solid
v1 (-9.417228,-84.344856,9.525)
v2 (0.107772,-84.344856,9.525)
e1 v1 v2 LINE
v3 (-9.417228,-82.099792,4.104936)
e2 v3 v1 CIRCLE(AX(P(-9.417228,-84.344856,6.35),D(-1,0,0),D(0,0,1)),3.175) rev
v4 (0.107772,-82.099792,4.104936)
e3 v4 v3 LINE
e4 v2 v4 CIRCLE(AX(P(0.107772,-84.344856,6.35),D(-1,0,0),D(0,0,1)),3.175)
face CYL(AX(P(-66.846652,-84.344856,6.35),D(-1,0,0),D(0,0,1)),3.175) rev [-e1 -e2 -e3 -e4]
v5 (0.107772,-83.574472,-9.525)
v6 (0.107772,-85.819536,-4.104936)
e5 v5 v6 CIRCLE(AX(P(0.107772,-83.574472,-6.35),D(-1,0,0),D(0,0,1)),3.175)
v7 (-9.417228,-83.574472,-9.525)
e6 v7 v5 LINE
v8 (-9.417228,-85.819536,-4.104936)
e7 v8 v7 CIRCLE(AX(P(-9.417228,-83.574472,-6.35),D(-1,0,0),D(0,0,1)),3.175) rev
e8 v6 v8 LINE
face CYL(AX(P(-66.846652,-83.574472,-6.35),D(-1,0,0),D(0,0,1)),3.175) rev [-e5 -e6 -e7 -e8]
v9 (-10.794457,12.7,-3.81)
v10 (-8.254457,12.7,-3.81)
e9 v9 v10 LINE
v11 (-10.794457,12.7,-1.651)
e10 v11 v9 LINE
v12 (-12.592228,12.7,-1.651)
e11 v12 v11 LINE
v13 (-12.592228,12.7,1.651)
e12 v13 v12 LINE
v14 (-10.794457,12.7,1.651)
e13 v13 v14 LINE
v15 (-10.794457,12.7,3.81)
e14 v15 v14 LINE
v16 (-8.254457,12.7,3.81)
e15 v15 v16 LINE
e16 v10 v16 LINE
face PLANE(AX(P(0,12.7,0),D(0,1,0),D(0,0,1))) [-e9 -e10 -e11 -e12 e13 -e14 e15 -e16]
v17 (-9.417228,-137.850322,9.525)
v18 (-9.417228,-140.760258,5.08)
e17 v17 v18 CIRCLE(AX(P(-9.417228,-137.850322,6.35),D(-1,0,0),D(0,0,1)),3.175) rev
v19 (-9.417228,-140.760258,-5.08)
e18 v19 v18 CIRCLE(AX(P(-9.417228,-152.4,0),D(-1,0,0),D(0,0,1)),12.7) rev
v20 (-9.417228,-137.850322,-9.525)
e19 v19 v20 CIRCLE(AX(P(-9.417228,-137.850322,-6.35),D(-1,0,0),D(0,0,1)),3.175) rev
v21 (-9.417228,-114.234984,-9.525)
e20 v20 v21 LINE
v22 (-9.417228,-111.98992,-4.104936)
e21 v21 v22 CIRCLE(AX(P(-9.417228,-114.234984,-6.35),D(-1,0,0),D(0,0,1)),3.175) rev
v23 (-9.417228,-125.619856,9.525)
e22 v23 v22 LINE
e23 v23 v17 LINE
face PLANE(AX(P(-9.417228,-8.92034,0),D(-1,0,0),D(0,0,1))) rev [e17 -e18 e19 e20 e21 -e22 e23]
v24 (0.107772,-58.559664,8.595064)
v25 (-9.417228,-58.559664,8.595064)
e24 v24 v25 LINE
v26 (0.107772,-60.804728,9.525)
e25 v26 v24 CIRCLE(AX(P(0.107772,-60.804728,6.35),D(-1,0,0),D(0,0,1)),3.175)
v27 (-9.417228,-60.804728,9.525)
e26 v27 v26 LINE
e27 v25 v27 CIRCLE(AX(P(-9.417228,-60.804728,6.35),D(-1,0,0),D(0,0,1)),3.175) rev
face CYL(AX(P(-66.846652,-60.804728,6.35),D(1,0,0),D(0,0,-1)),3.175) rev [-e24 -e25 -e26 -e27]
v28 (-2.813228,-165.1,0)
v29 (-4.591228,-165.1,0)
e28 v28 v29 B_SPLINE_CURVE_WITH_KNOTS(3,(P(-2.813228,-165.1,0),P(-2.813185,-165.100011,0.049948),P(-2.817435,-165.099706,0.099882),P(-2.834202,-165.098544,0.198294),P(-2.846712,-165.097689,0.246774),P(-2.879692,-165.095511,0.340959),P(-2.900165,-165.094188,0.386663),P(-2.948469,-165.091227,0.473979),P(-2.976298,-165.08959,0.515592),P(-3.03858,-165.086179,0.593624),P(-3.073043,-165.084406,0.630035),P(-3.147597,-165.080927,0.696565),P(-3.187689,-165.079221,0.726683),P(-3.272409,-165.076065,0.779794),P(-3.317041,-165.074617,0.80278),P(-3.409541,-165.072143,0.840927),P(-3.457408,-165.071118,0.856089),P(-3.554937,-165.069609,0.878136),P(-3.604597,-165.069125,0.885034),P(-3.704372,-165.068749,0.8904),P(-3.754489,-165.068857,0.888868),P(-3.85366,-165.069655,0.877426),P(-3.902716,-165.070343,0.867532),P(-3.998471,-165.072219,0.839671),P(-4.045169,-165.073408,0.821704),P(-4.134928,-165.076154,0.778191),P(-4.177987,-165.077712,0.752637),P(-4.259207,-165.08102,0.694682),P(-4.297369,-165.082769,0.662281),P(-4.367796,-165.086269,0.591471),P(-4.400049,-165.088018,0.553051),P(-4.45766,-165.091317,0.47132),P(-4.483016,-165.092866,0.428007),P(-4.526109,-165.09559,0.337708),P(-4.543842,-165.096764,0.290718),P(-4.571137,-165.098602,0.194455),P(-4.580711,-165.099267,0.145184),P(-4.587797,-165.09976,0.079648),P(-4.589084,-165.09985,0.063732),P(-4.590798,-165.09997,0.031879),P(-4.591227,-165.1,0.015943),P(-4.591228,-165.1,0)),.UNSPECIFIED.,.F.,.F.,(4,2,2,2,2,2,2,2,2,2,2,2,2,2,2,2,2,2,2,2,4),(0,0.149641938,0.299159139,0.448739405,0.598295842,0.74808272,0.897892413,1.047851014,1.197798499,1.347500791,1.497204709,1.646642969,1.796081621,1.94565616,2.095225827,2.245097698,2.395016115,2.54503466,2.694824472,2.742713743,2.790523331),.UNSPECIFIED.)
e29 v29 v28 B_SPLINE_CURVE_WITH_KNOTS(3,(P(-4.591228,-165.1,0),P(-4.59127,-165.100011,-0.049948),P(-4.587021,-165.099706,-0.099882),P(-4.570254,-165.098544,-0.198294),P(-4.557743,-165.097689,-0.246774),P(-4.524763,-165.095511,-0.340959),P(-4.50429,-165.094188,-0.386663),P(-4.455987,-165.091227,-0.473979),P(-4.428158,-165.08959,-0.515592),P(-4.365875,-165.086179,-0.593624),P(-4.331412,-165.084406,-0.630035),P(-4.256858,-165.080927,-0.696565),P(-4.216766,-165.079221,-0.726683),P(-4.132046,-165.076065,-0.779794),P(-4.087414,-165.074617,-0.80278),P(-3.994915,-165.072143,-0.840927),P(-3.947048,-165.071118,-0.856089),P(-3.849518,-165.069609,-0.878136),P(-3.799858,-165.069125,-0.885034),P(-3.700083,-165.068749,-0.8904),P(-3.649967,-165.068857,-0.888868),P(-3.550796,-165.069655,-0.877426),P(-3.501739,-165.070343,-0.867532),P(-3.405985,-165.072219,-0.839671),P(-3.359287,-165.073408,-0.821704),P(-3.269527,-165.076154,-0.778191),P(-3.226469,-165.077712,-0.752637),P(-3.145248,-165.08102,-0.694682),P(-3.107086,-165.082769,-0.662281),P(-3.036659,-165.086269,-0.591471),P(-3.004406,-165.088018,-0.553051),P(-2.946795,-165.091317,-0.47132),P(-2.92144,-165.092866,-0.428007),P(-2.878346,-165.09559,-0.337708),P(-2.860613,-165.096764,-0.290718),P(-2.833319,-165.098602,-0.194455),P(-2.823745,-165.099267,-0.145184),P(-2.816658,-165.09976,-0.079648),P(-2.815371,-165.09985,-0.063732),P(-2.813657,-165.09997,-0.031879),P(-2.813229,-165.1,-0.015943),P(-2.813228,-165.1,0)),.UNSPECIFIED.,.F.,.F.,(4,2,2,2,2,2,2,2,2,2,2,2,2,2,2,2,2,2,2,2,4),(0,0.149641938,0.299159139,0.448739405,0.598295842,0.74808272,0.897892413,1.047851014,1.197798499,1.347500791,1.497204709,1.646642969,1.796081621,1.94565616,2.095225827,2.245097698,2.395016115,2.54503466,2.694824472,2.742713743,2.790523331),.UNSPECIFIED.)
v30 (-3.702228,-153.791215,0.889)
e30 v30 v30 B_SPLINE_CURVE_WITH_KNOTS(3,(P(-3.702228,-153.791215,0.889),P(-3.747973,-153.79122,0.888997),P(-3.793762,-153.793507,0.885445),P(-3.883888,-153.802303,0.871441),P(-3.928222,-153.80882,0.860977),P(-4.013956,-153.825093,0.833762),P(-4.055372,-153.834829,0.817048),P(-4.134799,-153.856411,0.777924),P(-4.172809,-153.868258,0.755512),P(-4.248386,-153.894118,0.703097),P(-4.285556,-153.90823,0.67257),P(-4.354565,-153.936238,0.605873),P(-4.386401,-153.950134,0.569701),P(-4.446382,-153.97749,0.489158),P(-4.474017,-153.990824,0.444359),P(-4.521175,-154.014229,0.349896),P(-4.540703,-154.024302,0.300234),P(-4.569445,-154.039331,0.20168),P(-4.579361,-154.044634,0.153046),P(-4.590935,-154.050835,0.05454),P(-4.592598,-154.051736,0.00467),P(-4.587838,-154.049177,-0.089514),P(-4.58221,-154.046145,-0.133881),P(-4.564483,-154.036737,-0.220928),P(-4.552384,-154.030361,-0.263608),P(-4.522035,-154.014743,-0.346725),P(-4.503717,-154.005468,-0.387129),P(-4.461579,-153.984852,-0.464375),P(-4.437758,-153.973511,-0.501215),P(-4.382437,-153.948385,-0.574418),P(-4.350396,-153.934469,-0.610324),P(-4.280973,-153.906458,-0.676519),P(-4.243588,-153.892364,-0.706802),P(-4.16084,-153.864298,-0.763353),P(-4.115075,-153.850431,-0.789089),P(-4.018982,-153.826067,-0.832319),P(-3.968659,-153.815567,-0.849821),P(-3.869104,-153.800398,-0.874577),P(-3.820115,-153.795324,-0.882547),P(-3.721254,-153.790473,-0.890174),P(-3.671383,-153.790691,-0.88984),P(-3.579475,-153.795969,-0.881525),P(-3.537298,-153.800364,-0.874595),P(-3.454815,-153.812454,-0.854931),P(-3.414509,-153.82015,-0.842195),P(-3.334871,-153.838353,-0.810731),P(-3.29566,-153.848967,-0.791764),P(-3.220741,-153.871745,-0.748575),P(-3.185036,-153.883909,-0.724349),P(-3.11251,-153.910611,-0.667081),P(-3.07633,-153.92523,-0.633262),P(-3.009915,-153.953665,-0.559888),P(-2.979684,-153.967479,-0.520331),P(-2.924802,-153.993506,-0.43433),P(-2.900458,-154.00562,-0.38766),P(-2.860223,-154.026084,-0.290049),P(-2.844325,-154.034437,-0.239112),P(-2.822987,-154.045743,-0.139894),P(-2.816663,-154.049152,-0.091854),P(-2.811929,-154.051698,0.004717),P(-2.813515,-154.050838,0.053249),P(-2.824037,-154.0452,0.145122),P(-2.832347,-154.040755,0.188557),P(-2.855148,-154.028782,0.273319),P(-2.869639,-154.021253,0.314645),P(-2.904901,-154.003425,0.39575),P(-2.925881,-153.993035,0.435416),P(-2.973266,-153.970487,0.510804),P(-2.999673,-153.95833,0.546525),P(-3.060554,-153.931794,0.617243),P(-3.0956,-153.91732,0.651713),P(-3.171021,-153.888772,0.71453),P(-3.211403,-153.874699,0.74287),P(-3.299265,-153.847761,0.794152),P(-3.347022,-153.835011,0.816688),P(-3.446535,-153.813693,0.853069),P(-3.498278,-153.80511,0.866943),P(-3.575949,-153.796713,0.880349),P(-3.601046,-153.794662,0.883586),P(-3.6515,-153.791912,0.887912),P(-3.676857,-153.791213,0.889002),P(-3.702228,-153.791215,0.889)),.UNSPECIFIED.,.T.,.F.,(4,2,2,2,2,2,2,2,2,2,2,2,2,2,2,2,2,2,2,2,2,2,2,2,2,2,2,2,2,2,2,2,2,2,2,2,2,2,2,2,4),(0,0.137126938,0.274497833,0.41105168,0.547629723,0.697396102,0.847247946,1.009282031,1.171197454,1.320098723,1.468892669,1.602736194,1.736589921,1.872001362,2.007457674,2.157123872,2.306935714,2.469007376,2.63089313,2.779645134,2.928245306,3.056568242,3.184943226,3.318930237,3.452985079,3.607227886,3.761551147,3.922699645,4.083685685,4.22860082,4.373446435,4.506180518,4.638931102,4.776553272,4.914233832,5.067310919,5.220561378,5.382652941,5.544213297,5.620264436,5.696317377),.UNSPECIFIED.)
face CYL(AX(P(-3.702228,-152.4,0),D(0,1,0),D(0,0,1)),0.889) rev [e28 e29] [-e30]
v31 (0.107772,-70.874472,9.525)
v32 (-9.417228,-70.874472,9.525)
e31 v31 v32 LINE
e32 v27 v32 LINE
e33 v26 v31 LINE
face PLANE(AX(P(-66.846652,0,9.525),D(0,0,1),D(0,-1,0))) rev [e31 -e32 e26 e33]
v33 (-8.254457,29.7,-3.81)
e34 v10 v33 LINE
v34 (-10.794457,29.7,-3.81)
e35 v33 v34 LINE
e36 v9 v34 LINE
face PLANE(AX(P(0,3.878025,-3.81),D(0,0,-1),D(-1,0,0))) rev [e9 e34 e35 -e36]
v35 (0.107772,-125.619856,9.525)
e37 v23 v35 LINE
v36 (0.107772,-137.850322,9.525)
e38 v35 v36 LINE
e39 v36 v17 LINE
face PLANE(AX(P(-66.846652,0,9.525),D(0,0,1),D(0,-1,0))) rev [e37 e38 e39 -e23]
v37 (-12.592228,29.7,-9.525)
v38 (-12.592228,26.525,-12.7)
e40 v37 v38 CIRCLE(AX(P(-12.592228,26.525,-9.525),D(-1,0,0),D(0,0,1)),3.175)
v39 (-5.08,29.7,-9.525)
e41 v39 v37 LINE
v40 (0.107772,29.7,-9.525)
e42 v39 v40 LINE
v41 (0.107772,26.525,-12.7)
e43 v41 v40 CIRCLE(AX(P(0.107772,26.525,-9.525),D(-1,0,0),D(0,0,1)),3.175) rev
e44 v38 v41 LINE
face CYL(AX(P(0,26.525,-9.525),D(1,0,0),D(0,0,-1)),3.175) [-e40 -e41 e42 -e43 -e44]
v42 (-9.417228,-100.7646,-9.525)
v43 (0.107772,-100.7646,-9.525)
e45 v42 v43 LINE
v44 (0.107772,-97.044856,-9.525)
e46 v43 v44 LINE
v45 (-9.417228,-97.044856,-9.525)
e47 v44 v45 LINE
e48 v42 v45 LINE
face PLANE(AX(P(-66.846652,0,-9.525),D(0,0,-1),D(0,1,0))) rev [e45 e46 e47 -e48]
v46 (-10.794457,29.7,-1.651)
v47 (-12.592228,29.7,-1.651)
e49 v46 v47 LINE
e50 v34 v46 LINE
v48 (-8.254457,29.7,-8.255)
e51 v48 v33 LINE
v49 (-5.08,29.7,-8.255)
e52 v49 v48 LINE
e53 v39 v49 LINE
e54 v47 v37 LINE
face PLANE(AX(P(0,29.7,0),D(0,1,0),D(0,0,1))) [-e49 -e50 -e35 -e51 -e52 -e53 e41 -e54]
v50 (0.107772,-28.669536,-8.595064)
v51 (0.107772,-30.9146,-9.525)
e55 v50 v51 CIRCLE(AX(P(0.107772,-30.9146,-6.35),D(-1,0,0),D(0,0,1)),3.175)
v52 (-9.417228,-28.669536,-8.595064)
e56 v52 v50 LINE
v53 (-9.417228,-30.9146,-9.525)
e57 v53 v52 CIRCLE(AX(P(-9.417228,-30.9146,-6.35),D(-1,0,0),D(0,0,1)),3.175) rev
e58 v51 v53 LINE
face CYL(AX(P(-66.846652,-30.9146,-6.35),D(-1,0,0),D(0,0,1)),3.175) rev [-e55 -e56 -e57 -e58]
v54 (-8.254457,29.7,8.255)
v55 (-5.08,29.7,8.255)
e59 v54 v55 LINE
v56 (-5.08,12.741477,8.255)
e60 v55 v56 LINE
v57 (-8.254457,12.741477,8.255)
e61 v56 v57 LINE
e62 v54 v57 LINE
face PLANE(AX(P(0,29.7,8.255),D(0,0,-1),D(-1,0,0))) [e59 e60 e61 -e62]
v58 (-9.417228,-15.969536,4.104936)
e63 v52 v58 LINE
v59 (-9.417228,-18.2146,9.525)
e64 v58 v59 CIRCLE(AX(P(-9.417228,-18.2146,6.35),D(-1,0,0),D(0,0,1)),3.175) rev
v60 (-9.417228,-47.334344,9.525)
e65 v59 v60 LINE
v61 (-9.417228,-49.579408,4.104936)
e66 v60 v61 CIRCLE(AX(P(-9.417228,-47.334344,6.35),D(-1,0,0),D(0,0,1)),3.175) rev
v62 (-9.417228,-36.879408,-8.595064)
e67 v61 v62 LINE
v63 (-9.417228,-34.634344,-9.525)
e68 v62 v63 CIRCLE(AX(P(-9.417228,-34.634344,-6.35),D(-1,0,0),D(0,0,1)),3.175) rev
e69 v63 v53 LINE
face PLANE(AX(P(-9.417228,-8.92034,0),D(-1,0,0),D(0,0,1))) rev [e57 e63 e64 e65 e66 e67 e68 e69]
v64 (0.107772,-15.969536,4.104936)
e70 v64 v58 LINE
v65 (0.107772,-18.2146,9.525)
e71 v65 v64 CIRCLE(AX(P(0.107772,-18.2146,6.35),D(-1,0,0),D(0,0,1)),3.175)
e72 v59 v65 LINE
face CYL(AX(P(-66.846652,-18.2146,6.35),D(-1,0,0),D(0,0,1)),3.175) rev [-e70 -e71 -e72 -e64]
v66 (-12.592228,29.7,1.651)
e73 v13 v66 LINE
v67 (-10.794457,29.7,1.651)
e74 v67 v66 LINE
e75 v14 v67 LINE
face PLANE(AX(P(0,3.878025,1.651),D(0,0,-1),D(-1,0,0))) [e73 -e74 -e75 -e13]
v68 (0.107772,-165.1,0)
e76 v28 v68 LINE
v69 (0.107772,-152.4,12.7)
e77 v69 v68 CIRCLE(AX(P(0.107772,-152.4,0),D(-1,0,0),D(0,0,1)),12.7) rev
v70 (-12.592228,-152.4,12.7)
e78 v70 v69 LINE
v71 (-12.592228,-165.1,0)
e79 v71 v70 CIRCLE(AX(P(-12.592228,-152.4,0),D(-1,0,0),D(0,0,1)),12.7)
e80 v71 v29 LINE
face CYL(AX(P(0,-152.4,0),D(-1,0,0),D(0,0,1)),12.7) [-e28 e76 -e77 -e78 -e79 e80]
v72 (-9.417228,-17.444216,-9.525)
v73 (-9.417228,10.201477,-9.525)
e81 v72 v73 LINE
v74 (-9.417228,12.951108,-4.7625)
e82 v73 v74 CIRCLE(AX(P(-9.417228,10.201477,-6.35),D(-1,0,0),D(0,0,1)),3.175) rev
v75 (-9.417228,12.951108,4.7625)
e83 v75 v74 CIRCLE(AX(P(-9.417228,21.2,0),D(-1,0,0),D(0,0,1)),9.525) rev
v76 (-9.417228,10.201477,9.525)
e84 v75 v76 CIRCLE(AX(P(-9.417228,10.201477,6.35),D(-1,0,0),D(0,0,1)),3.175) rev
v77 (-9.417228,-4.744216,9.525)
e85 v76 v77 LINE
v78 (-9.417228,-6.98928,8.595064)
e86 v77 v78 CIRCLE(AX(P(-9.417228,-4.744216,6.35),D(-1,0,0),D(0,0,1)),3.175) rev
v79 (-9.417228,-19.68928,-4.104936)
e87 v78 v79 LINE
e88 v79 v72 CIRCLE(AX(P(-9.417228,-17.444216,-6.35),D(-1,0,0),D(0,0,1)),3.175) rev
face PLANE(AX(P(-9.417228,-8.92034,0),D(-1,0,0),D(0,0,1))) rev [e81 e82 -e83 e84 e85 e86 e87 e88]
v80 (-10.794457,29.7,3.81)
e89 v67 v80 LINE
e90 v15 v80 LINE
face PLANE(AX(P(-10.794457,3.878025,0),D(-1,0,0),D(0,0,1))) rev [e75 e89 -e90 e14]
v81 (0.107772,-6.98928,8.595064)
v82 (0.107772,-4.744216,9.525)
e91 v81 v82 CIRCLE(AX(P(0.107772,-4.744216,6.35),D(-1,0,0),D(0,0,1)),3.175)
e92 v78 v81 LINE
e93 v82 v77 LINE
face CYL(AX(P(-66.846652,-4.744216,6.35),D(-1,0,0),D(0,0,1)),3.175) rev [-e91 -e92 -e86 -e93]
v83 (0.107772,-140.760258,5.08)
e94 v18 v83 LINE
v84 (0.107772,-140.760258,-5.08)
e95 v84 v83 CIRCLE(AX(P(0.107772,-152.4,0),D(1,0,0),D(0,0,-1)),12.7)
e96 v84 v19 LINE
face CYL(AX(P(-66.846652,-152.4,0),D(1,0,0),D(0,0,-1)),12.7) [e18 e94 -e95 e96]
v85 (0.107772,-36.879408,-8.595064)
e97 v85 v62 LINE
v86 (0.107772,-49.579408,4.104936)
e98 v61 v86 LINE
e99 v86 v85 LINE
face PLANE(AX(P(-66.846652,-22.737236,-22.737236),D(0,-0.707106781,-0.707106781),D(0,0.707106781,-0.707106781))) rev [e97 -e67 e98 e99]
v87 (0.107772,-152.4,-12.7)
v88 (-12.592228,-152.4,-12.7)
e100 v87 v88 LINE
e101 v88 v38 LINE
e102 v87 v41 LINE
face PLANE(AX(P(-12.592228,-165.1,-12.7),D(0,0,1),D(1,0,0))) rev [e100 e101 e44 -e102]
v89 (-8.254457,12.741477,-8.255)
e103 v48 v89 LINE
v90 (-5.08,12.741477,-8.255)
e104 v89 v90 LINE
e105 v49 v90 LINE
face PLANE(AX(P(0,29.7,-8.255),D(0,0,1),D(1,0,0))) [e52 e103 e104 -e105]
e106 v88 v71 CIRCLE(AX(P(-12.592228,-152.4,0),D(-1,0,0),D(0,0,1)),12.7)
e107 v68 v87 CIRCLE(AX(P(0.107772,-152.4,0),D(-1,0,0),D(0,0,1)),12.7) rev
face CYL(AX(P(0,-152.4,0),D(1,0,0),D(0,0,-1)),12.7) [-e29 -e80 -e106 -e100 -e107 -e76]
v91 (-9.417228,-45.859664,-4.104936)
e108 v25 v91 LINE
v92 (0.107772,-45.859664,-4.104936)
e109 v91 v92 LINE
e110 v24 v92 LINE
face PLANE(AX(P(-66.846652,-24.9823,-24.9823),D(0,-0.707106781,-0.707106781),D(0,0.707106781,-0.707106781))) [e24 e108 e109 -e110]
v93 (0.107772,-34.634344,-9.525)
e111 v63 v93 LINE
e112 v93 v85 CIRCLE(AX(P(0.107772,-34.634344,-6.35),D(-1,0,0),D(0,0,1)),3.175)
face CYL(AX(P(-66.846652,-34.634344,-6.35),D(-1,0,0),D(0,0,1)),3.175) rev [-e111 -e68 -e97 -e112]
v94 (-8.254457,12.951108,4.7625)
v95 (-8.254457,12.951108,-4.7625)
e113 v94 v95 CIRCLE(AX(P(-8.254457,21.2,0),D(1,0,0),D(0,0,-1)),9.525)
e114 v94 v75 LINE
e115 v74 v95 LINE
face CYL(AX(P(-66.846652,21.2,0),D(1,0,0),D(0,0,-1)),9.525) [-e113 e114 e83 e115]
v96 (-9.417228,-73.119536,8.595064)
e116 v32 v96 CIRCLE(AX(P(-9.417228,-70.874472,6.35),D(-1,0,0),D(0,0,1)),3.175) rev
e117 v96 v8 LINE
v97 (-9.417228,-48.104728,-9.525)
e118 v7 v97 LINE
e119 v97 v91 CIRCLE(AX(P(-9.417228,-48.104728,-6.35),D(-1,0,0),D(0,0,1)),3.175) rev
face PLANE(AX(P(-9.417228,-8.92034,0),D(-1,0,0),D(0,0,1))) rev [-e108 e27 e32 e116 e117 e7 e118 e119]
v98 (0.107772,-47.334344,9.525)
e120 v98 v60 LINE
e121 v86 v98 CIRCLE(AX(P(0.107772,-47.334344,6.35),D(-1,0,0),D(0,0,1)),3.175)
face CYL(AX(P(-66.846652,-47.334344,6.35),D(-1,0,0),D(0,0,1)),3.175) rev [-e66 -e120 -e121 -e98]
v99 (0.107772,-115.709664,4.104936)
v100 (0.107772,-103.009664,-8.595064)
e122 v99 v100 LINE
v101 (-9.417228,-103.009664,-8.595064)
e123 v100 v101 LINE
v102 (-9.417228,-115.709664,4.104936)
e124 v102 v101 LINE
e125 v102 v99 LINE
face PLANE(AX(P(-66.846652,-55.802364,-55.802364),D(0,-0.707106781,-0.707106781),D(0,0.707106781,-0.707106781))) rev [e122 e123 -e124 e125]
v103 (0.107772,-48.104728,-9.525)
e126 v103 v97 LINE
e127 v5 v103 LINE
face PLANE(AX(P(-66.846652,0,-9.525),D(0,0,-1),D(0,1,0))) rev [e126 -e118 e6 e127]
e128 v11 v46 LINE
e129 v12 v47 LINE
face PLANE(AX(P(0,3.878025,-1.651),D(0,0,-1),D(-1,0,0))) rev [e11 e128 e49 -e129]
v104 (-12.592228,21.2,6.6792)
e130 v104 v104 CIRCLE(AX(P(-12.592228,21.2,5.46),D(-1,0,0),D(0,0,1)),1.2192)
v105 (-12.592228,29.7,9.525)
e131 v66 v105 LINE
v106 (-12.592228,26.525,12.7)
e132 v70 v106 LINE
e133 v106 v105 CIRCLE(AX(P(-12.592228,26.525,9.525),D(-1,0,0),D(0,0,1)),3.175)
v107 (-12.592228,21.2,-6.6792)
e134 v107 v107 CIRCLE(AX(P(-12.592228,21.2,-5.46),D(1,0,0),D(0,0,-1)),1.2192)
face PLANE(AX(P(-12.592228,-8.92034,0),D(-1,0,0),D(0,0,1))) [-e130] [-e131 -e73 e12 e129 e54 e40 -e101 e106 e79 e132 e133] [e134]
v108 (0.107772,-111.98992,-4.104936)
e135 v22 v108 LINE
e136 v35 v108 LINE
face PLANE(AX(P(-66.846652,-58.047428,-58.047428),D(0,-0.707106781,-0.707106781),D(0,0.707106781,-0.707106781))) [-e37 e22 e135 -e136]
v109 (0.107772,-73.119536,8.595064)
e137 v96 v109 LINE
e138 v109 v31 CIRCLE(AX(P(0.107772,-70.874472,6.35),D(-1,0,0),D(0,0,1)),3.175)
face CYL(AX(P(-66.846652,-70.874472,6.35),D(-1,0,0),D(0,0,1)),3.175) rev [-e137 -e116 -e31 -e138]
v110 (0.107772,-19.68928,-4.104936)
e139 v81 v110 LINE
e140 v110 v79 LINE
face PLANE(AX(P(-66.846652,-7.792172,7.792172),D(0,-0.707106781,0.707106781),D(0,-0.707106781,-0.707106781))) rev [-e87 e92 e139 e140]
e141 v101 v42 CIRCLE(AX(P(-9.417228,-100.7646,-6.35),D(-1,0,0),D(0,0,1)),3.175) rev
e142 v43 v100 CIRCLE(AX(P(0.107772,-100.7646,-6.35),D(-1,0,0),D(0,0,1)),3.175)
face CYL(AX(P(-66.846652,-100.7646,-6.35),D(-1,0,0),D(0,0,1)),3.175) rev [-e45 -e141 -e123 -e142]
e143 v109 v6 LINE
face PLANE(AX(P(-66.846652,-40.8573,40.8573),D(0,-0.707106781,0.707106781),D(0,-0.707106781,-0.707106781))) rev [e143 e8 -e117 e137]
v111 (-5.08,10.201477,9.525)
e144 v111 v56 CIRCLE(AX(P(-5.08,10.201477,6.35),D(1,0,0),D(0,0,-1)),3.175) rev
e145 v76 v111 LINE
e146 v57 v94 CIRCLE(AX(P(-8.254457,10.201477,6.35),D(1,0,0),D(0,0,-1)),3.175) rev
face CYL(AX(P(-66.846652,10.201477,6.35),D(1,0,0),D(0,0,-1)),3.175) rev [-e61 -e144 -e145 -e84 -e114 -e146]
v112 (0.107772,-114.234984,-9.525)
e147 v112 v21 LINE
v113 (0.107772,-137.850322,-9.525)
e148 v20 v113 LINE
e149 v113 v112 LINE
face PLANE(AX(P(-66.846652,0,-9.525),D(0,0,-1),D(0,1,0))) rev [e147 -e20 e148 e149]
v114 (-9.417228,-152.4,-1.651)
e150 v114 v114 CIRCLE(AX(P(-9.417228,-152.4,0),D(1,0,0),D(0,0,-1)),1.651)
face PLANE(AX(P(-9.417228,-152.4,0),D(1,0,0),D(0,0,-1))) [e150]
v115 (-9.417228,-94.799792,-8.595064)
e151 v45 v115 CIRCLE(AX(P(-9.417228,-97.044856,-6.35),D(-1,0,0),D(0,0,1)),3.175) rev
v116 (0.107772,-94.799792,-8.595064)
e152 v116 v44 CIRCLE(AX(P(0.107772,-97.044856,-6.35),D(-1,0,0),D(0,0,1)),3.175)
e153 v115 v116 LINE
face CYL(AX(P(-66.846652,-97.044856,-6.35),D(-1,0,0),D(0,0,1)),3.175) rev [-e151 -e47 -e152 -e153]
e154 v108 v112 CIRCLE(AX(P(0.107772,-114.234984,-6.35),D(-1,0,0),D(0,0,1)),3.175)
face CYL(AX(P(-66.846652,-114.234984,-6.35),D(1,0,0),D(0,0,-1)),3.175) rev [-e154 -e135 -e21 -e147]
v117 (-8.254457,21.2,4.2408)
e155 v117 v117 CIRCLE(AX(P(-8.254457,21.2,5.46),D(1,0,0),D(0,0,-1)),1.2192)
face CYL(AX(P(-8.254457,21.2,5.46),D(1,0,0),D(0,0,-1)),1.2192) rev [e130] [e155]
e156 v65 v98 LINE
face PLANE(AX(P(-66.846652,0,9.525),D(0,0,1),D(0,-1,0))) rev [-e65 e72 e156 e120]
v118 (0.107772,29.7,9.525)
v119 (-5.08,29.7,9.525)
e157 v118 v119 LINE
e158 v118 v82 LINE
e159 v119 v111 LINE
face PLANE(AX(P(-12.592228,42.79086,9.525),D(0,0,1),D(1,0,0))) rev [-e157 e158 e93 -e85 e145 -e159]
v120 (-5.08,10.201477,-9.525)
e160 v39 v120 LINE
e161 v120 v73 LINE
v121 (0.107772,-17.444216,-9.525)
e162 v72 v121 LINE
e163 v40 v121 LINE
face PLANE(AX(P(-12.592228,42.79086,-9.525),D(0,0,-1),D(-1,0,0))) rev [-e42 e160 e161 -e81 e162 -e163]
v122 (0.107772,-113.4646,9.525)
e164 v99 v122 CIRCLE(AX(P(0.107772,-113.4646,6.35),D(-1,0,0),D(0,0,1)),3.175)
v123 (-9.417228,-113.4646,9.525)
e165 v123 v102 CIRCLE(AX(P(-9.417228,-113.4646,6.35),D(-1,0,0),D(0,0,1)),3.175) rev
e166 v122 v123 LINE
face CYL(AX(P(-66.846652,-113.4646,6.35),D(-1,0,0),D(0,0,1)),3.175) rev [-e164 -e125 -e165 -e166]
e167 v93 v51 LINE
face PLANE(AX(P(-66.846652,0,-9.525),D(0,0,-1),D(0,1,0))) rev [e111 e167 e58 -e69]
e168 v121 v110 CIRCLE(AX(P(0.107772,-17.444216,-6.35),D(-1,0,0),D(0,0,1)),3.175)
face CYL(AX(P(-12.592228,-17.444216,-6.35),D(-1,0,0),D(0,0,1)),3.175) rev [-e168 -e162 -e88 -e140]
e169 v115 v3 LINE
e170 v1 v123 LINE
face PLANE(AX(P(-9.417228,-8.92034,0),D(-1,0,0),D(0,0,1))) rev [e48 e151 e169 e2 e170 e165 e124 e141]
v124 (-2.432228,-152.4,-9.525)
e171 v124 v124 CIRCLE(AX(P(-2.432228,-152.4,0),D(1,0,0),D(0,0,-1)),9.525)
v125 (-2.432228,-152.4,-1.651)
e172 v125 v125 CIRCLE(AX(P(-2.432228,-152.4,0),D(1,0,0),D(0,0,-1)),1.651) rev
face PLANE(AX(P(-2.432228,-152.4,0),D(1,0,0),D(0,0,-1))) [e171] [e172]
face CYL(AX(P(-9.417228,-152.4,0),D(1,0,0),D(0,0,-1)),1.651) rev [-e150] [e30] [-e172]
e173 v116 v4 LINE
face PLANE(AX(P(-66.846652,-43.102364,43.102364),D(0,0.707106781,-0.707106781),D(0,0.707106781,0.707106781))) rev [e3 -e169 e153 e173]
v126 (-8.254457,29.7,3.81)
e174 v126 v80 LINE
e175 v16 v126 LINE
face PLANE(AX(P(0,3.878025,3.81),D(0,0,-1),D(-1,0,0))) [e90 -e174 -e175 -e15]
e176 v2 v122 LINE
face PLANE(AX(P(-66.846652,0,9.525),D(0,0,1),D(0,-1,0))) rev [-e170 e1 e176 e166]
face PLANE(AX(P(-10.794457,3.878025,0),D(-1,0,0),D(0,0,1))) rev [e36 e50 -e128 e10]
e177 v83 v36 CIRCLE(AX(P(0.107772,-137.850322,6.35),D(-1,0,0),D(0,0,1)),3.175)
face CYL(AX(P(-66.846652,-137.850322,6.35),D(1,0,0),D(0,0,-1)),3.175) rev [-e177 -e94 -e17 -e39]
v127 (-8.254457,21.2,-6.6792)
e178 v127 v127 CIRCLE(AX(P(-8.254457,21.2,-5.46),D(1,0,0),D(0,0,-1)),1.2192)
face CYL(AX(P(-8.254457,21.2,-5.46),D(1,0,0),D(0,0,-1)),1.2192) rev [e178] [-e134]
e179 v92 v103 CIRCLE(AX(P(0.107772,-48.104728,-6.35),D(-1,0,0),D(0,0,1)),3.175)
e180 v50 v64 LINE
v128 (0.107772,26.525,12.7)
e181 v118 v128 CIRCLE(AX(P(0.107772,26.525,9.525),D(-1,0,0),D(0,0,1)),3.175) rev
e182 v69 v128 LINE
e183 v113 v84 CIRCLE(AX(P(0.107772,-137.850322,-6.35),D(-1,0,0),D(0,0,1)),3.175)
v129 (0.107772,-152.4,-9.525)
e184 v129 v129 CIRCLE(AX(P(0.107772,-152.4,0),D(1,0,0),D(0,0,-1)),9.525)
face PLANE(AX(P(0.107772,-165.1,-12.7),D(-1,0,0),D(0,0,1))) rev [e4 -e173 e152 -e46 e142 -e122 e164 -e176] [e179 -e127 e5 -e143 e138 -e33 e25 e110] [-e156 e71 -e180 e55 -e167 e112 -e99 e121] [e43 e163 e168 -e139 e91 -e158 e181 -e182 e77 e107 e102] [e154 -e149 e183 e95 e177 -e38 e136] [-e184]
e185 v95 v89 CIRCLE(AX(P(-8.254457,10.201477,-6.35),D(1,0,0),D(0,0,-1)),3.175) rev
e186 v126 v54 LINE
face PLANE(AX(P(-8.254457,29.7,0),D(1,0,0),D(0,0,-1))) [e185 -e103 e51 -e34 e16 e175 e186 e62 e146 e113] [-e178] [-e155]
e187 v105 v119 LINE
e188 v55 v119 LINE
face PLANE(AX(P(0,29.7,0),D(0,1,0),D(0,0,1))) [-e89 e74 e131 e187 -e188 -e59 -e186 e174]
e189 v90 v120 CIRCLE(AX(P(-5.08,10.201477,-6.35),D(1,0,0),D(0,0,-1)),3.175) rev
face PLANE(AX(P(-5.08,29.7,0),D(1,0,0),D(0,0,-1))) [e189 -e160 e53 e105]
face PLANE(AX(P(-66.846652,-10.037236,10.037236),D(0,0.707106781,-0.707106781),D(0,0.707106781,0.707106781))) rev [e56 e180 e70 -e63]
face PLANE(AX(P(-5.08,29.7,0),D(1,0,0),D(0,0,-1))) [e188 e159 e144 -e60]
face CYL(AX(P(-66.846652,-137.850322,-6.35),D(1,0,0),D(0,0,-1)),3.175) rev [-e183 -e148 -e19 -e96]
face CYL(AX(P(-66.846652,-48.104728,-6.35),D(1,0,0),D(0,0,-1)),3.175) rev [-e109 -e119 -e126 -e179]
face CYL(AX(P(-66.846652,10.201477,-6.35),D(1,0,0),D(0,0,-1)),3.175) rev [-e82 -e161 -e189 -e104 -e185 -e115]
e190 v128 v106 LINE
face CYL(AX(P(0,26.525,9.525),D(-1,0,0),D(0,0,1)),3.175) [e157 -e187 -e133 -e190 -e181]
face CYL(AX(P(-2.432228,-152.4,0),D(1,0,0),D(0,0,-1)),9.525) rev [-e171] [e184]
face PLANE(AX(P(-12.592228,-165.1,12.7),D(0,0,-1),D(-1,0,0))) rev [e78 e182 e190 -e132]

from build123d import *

# Parameters (mm, degrees)
SKETCH1_R                 = 12.7
BOSS_EXTRUDE1_DEPTH       = 12.7
BOSS_EXTRUDE2_DEPTH       = 17
CUT_EXTRUDE3_DEPTH        = 17
BOSS_EXTRUDE4_REACH       = 36.708
F_2_CLEARANCE_HOLE1_D     = 2.4384
F_2_CLEARANCE_HOLE1_DEPTH = 25.4
F_2_CLEARANCE_HOLE1_TIP   = 0.732569267
SKETCH14_W                = 52.115370156
SKETCH14_H                = 48.846284602
CUT_EXTRUDE4_DEPTH        = 12.7
SKETCH15_W                = 12.7
SKETCH15_H                = 25.4
BOSS_EXTRUDE5_DEPTH       = 177.8
SKETCH16_W                = 12.7
SKETCH16_H                = 3.175
BOSS_EXTRUDE6_DEPTH       = 17
FILLET1_R                 = 3.175
FILLET2_R                 = 12.7
SKETCH17_R                = 1.651
CUT_EXTRUDE5_DEPTH        = 9.525
SKETCH18_R                = 9.525
CUT_EXTRUDE6_DEPTH        = 2.54
CUT_EXTRUDE7_START        = -9.525
CUT_EXTRUDE7_DEPTH        = 9.525
SKETCH23_W                = 12.972727012
SKETCH23_H                = 10.013690803
CUT_EXTRUDE8_DEPTH        = 8.362229451
FILLET3_R                 = 3.175


# Read off the part's stored shape, not the designer's step: Cut-Extrude7
# Some blends are built 0.0001 mm under size
with BuildPart() as part:
    # Sketch1 → Boss-Extrude1 (new body)
    with BuildSketch(Plane(origin=(0, 0, 0), x_dir=(1, 0, 0), z_dir=(0, 1, 0))):
        with Locations(Location((0, 0, 0), (0, 0, 270))):
            Circle(SKETCH1_R)
    extrude(amount=BOSS_EXTRUDE1_DEPTH)

    # Sketch7 → Boss-Extrude2 (add)
    with BuildSketch(Plane(origin=(0, 12.7, 0), x_dir=(1, 0, 0), z_dir=(0, 1, 0))):
        with BuildLine():
            ThreePointArc((-8.400260413, 9.525), (-11.575260413, 5.225260413), (-12.7, 0))
            ThreePointArc((-12.7, 0), (-11.575260413, -5.225260413), (-8.400260413, -9.525))
            Line((-8.400260413, -9.525), (-5.08, -9.525))
            Line((-5.08, -9.525), (-5.08, -8.255))
            Line((-5.08, -8.255), (-8.254457173, -8.255))
            Line((-8.254457173, -8.255), (-8.254457173, 8.255))
            Line((-8.254457173, 8.255), (-5.08, 8.255))
            Line((-5.08, 8.255), (-5.08, 9.525))
            Line((-5.08, 9.525), (-8.400260413, 9.525))
        make_face()
    extrude(amount=BOSS_EXTRUDE2_DEPTH)

    # Sketch8 → Cut-Extrude3 (cut)
    with BuildSketch(Plane(origin=(0, 29.7, 0), x_dir=(1, 0, 0), z_dir=(0, 1, 0))):
        Polygon((-8.254457173, -3.81), (-8.254457173, 3.81), (-10.794457173, 3.81), (-10.794457173, 1.651), (-12.7, 1.651), (-12.7, -1.651), (-10.794457173, -1.651), (-10.794457173, -3.81), align=None)
    extrude(amount=-CUT_EXTRUDE3_DEPTH, mode=Mode.SUBTRACT)

    # Boss-Extrude4: up to this face of the body (flat: up to its plane)
    boss_extrude4_end = Plane(part.part.faces().sort_by_distance((0, 0, 0))[0])
    # Sketch13 → Boss-Extrude4 (add, up to the picked face)
    with BuildSketch(Plane(origin=(0, 29.7, 0), x_dir=(1, 0, 0), z_dir=(0, 1, 0)), mode=Mode.PRIVATE) as boss_extrude4_sk1:
        with BuildLine():
            Line((-12.592227722, 1.651), (-12.592227722, 9.525))
            Line((-12.592227722, 9.525), (-8.400260413, 9.525))
            ThreePointArc((-8.400260413, 9.525), (-11.210312597, 5.968156456), (-12.592227722, 1.651))
        make_face()
    boss_extrude4_tool1 = split(extrude(boss_extrude4_sk1.sketch, amount=-BOSS_EXTRUDE4_REACH, mode=Mode.PRIVATE), bisect_by=boss_extrude4_end, keep=Keep.BOTH, mode=Mode.PRIVATE)
    # Sketch13 → Boss-Extrude4 (add, up to the picked face)
    with BuildSketch(Plane(origin=(0, 29.7, 0), x_dir=(1, 0, 0), z_dir=(0, 1, 0)), mode=Mode.PRIVATE) as boss_extrude4_sk2:
        with BuildLine():
            Line((-12.592227722, -1.651), (-12.592227722, -9.525))
            Line((-12.592227722, -9.525), (-8.400260413, -9.525))
            ThreePointArc((-8.400260413, -9.525), (-11.210312597, -5.968156456), (-12.592227722, -1.651))
        make_face()
    boss_extrude4_tool2 = split(extrude(boss_extrude4_sk2.sketch, amount=-BOSS_EXTRUDE4_REACH, mode=Mode.PRIVATE), bisect_by=boss_extrude4_end, keep=Keep.BOTH, mode=Mode.PRIVATE)
    add(boss_extrude4_tool1.solids().sort_by(Axis((-11.366083, 29.7, -7.381946), (0, -1, 0)))[0])
    add(boss_extrude4_tool2.solids().sort_by(Axis((-11.366083, 29.7, 7.381946), (0, -1, 0)))[0])

    # #2 Clearance Hole1
    with Locations(Plane(origin=(-8.254457173, 0, 0), x_dir=(0, 0, -1), z_dir=(1, 0, 0))):
        with Locations((-5.46, 21.2), (5.46, 21.2)):
            Hole(F_2_CLEARANCE_HOLE1_D / 2, depth=F_2_CLEARANCE_HOLE1_DEPTH)
            with Locations((0, 0, -(F_2_CLEARANCE_HOLE1_DEPTH + F_2_CLEARANCE_HOLE1_TIP / 2))):  # 118° drill point
                Cone(0, F_2_CLEARANCE_HOLE1_D / 2, F_2_CLEARANCE_HOLE1_TIP, mode=Mode.SUBTRACT)

    # Sketch14 → Cut-Extrude4 (cut)
    with BuildSketch(Plane(origin=(0, 12.7, 0), x_dir=(1, 0, 0), z_dir=(0, 1, 0))):
        Rectangle(SKETCH14_W, SKETCH14_H)
    extrude(amount=-CUT_EXTRUDE4_DEPTH, mode=Mode.SUBTRACT)


with BuildPart() as cut_extrude4_piece_1:
    # of the separate pieces the step leaves, piece 1, a body of its own (cut_extrude4_pieces)
    add(part.part.solids().sort_by_distance((-5.08, 29.7, 9.525))[0])



with BuildPart() as cut_extrude4_piece_2:
    # of the separate pieces the step leaves, piece 2, a body of its own (cut_extrude4_pieces)
    add(part.part.solids().sort_by_distance((-12.592227722, 29.7, -9.525))[0])


with BuildPart() as cut_extrude4_piece_1_1:
    add(cut_extrude4_piece_1.part)

    add(cut_extrude4_piece_2.part)  # Boss-Extrude5 merges Cut-Extrude4 piece 2
    # Sketch15 → Boss-Extrude5 (add)
    with BuildSketch(Plane.XZ.offset(-12.7)):
        with Locations((-6.242227722, 0)):
            Rectangle(SKETCH15_W, SKETCH15_H)
    extrude(amount=BOSS_EXTRUDE5_DEPTH)

    # Sketch16 → Boss-Extrude6 (add)
    with BuildSketch(Plane(origin=(0, 12.7, 0), x_dir=(1, 0, 0), z_dir=(0, 1, 0))):
        with Locations((-6.242227722, 11.1125)):
            Rectangle(SKETCH16_W, SKETCH16_H)
        with Locations((-6.242227722, -11.1125)):
            Rectangle(SKETCH16_W, SKETCH16_H)
    extrude(amount=BOSS_EXTRUDE6_DEPTH)

    # Fillet1
    fillet1_edges = [cut_extrude4_piece_1_1.edges().sort_by_distance(p)[0] for p in [
        (-6.242227722, 29.7, 12.7),
        (-6.242227722, 29.7, -12.7),
    ]]
    fillet(fillet1_edges, radius=FILLET1_R - 0.0001)  # a hair under: the kernel refuses the full size

    # Fillet2
    fillet2_edges = [cut_extrude4_piece_1_1.edges().sort_by_distance(p)[0] for p in [
        (-6.242227722, -165.1, 12.7),
        (-6.242227722, -165.1, -12.7),
    ]]
    fillet(fillet2_edges, radius=FILLET2_R - 0.0001)  # a hair under: the kernel refuses the full size

    # Sketch17 → Cut-Extrude5 (cut)
    with BuildSketch(Plane(origin=(0.107772278, 0, 0), x_dir=(0, 0, -1), z_dir=(1, 0, 0))):
        with Locations((0, -152.4)):
            Circle(SKETCH17_R)
    extrude(amount=-CUT_EXTRUDE5_DEPTH, mode=Mode.SUBTRACT)

    # Sketch18 → Cut-Extrude6 (cut)
    with BuildSketch(Plane(origin=(0.107772278, 0, 0), x_dir=(0, 0, -1), z_dir=(1, 0, 0))):
        with Locations((0, -152.4)):
            Circle(SKETCH18_R)
    extrude(amount=-CUT_EXTRUDE6_DEPTH, mode=Mode.SUBTRACT)

    # Sketch19 → #2-56 Tapped Hole1 (revolve, cut)
    with BuildSketch(Plane(origin=(-3.702227722, -152.4, 0), x_dir=(0, 0, 1), z_dir=(1, 0, 0))):
        Polygon((0, 0), (0, 13.74216509), (0.889, 13.208), (0.889, 0), align=None)
    revolve(axis=Axis((-3.702227722, -146.05, 0), (0, -1, 0)), mode=Mode.SUBTRACT)

    # Cut-Extrude7 outline → Cut-Extrude7 (cut)
    with BuildSketch(Plane(origin=(0.107772278, 0, 0), x_dir=(0, 0, -1), z_dir=(1, 0, 0)).offset(CUT_EXTRUDE7_START)):
        with BuildLine():
            Line((-9.525, -6.059343702), (9.525, -25.109343702))
            Line((9.525, -25.109343702), (9.525, 21.2))
            ThreePointArc((9.525, 21.2), (0, 11.675), (-9.525, 21.2))
            Line((-9.525, 21.2), (-9.525, -6.059343702))
        make_face()
        Polygon((-9.525, -54.999471762), (9.525, -35.949471762), (9.525, -29.599471762), (-9.525, -10.549471762), align=None)
        Polygon((-9.525, -72.189599823), (9.525, -91.239599823), (9.525, -40.439599823), (-9.525, -59.489599823), align=None)
        Polygon((-9.525, -121.129727883), (9.525, -102.079727883), (9.525, -95.729727883), (-9.525, -76.679727883), align=None)
        with BuildLine():
            ThreePointArc((-9.525, -143.999739587), (0, -139.7), (9.525, -143.999739587))
            Line((9.525, -143.999739587), (9.525, -106.569855944))
            Line((9.525, -106.569855944), (-9.525, -125.619855944))
            Line((-9.525, -125.619855944), (-9.525, -143.999739587))
        make_face()
    extrude(amount=CUT_EXTRUDE7_DEPTH, mode=Mode.SUBTRACT)

    # Sketch23 → Cut-Extrude8 (cut)
    with BuildSketch(Plane(origin=(-8.254457173, 0, 0), x_dir=(0, 0, -1), z_dir=(1, 0, 0))):
        with Locations((0.296508778, 11.530489285)):
            Rectangle(SKETCH23_W, SKETCH23_H)
    extrude(amount=CUT_EXTRUDE8_DEPTH, mode=Mode.SUBTRACT)

    # Fillet3
    # the kernel refuses this fillet: 3.175 mm, written as the material it adds along each edge
    with BuildSketch(Plane(origin=(-12.705047873, -6.059343702, 9.525), x_dir=(0, -0.7071067811865476, -0.7071067811865476), z_dir=(1, 0, 0))) as fillet3_piece_1_section:
        with BuildLine():
            CenterArc((FILLET3_R * 0.414213562373, FILLET3_R), FILLET3_R, 225, 45)
            Line((-FILLET3_R * 0.292893218813, FILLET3_R * 0.292893218813), (0, 0))
            Line((0, 0), (FILLET3_R * 0.414213562373, 0))
        make_face()
    fillet3_piece_1 = extrude(amount=12.812820151, mode=Mode.PRIVATE)
    fillet3_piece_1 = split(fillet3_piece_1, bisect_by=Plane(origin=(-12.592227722, -5.980218736, 9.333975434), z_dir=(1, 0, 0)), keep=Keep.TOP, mode=Mode.PRIVATE)
    add(fillet3_piece_1)
    with BuildSketch(Plane(origin=(-28.580047873, -25.109343702, -9.525), x_dir=(0, 1, 0), z_dir=(1, 0, 0))) as fillet3_piece_2_section:
        with BuildLine():
            CenterArc((FILLET3_R * 2.41421356237, FILLET3_R), FILLET3_R, 135, 135)
            Line((FILLET3_R * 1.70710678119, FILLET3_R * 1.70710678119), (0, 0))
            Line((0, 0), (FILLET3_R * 2.41421356237, 0))
        make_face()
    fillet3_piece_2 = extrude(amount=28.687820151, mode=Mode.PRIVATE)
    fillet3_piece_2 = split(fillet3_piece_2, bisect_by=Plane(origin=(-12.592227722, -21.703583978, -8.114288132), z_dir=(1, 0, 0)), keep=Keep.TOP, mode=Mode.PRIVATE)
    add(fillet3_piece_2)
    with BuildSketch(Plane(origin=(-36.913534292, 21.2, -9.525), x_dir=(0, -0.8660254037844385, 0.5000000000000003), z_dir=(1, 0, 0))) as fillet3_piece_3_section:
        with BuildLine():
            CenterArc((11.1125, 2.749630657), FILLET3_R, 120, 120)
            Line((9.525, 5.499261314), (0, 0))
            ThreePointArc((0, 0), (4.7625, 1.276108029), (9.525, 0))
        make_face()
    fillet3_piece_3 = extrude(amount=59.329840862, mode=Mode.PRIVATE)
    fillet3_piece_3 = split(fillet3_piece_3, bisect_by=Plane(origin=(-8.254457173, 14.198741561, -7.389428404), z_dir=(-1, 0, 0)), keep=Keep.TOP, mode=Mode.PRIVATE)
    fillet3_piece_3 = split(fillet3_piece_3, bisect_by=Plane(origin=(-12.592227722, 14.198741561, -7.389428404), z_dir=(1, 0, 0)), keep=Keep.TOP, mode=Mode.PRIVATE)
    add(fillet3_piece_3)
    with BuildSketch(Plane(origin=(-36.913534292, 21.2, -9.525), x_dir=(0, -0.8660254037844385, 0.5000000000000003), z_dir=(1, 0, 0))) as fillet3_piece_4_section:
        with BuildLine():
            CenterArc((11.1125, 2.749630657), FILLET3_R, 120, 120)
            Line((9.525, 5.499261314), (0, 0))
            ThreePointArc((0, 0), (4.7625, 1.276108029), (9.525, 0))
        make_face()
    fillet3_piece_4 = extrude(amount=31.833534292, mode=Mode.PRIVATE)
    fillet3_piece_4 = split(fillet3_piece_4, bisect_by=Plane(origin=(-6.667228586, 15.056349516, -8.255), z_dir=(0, 0, -1)), keep=Keep.TOP, mode=Mode.PRIVATE)
    fillet3_piece_4 = split(fillet3_piece_4, bisect_by=Plane(origin=(-12.592227722, 15.056349516, -8.990866495), z_dir=(1, 0, 0)), keep=Keep.TOP, mode=Mode.PRIVATE)
    add(fillet3_piece_4)
    with BuildSketch(Plane(origin=(-36.913534292, 21.2, 9.525), x_dir=(0, -0.8660254037844385, -0.5000000000000003), z_dir=(1, 0, 0))) as fillet3_piece_5_section:
        with BuildLine():
            CenterArc((11.1125, -2.749630657), FILLET3_R, 120, 120)
            Line((9.525, -5.499261314), (0, 0))
            ThreePointArc((0, 0), (4.7625, -1.276108029), (9.525, 0))
        make_face()
    fillet3_piece_5 = extrude(amount=59.329840862, mode=Mode.PRIVATE)
    fillet3_piece_5 = split(fillet3_piece_5, bisect_by=Plane(origin=(-8.254457173, 14.198741561, 7.389428404), z_dir=(-1, 0, 0)), keep=Keep.TOP, mode=Mode.PRIVATE)
    fillet3_piece_5 = split(fillet3_piece_5, bisect_by=Plane(origin=(-12.592227722, 14.198741561, 7.389428404), z_dir=(1, 0, 0)), keep=Keep.TOP, mode=Mode.PRIVATE)
    add(fillet3_piece_5)
    with BuildSketch(Plane(origin=(-36.913534292, 21.2, 9.525), x_dir=(0, -0.8660254037844385, -0.5000000000000003), z_dir=(1, 0, 0))) as fillet3_piece_6_section:
        with BuildLine():
            CenterArc((11.1125, -2.749630657), FILLET3_R, 120, 120)
            Line((9.525, -5.499261314), (0, 0))
            ThreePointArc((0, 0), (4.7625, -1.276108029), (9.525, 0))
        make_face()
    fillet3_piece_6 = extrude(amount=31.833534292, mode=Mode.PRIVATE)
    fillet3_piece_6 = split(fillet3_piece_6, bisect_by=Plane(origin=(-6.667228586, 15.056349516, 8.255), z_dir=(0, 0, 1)), keep=Keep.TOP, mode=Mode.PRIVATE)
    fillet3_piece_6 = split(fillet3_piece_6, bisect_by=Plane(origin=(-12.592227722, 15.056349516, 8.990866495), z_dir=(1, 0, 0)), keep=Keep.TOP, mode=Mode.PRIVATE)
    add(fillet3_piece_6)
    with BuildSketch(Plane(origin=(-28.580047873, -10.549471762, 9.525), x_dir=(0, -0.7071067811865476, -0.7071067811865475), z_dir=(1, 0, 0))) as fillet3_piece_7_section:
        with BuildLine():
            CenterArc((FILLET3_R * 2.41421356237, -FILLET3_R), FILLET3_R, 90, 135)
            Line((FILLET3_R * 1.70710678119, -FILLET3_R * 1.70710678119), (0, 0))
            Line((0, 0), (FILLET3_R * 2.41421356237, 0))
        make_face()
    fillet3_piece_7 = extrude(amount=28.687820151, mode=Mode.PRIVATE)
    fillet3_piece_7 = split(fillet3_piece_7, bisect_by=Plane(origin=(-12.592227722, -13.955231486, 8.114288132), z_dir=(1, 0, 0)), keep=Keep.TOP, mode=Mode.PRIVATE)
    add(fillet3_piece_7)
    with BuildSketch(Plane(origin=(-28.580047873, -54.999471762, 9.525), x_dir=(0, 0.7071067811865476, -0.7071067811865475), z_dir=(1, 0, 0))) as fillet3_piece_8_section:
        with BuildLine():
            CenterArc((FILLET3_R * 2.41421356237, FILLET3_R), FILLET3_R, 135, 135)
            Line((FILLET3_R * 1.70710678119, FILLET3_R * 1.70710678119), (0, 0))
            Line((0, 0), (FILLET3_R * 2.41421356237, 0))
        make_face()
    fillet3_piece_8 = extrude(amount=28.687820151, mode=Mode.PRIVATE)
    fillet3_piece_8 = split(fillet3_piece_8, bisect_by=Plane(origin=(-12.592227722, -51.593712038, 8.114288132), z_dir=(1, 0, 0)), keep=Keep.TOP, mode=Mode.PRIVATE)
    add(fillet3_piece_8)
    with BuildSketch(Plane(origin=(-12.705047873, -35.949471762, -9.525), x_dir=(0, 1, 0), z_dir=(1, 0, 0))) as fillet3_piece_9_section:
        with BuildLine():
            CenterArc((FILLET3_R * 0.414213562373, FILLET3_R), FILLET3_R, 225, 45)
            Line((-FILLET3_R * 0.292893218813, FILLET3_R * 0.292893218813), (0, 0))
            Line((0, 0), (FILLET3_R * 0.414213562373, 0))
        make_face()
    fillet3_piece_9 = extrude(amount=12.812820151, mode=Mode.PRIVATE)
    fillet3_piece_9 = split(fillet3_piece_9, bisect_by=Plane(origin=(-12.592227722, -35.870346796, -9.333975434), z_dir=(1, 0, 0)), keep=Keep.TOP, mode=Mode.PRIVATE)
    add(fillet3_piece_9)
    with BuildSketch(Plane(origin=(-12.705047873, -29.599471762, -9.525), x_dir=(0, 0.7071067811865481, 0.7071067811865468), z_dir=(1, 0, 0))) as fillet3_piece_10_section:
        with BuildLine():
            CenterArc((FILLET3_R * 0.414213562373, FILLET3_R), FILLET3_R, 225, 45)
            Line((-FILLET3_R * 0.292893218813, FILLET3_R * 0.292893218813), (0, 0))
            Line((0, 0), (FILLET3_R * 0.414213562373, 0))
        make_face()
    fillet3_piece_10 = extrude(amount=12.812820151, mode=Mode.PRIVATE)
    fillet3_piece_10 = split(fillet3_piece_10, bisect_by=Plane(origin=(-12.592227722, -29.678596728, -9.333975434), z_dir=(1, 0, 0)), keep=Keep.TOP, mode=Mode.PRIVATE)
    add(fillet3_piece_10)
    with BuildSketch(Plane(origin=(-12.705047873, -72.189599823, 9.525), x_dir=(0, -0.7071067811865476, -0.7071067811865476), z_dir=(1, 0, 0))) as fillet3_piece_11_section:
        with BuildLine():
            CenterArc((FILLET3_R * 0.414213562373, FILLET3_R), FILLET3_R, 225, 45)
            Line((-FILLET3_R * 0.292893218813, FILLET3_R * 0.292893218813), (0, 0))
            Line((0, 0), (FILLET3_R * 0.414213562373, 0))
        make_face()
    fillet3_piece_11 = extrude(amount=12.812820151, mode=Mode.PRIVATE)
    fillet3_piece_11 = split(fillet3_piece_11, bisect_by=Plane(origin=(-12.592227722, -72.110474857, 9.333975434), z_dir=(1, 0, 0)), keep=Keep.TOP, mode=Mode.PRIVATE)
    add(fillet3_piece_11)
    with BuildSketch(Plane(origin=(-28.580047873, -91.239599823, -9.525), x_dir=(0, 1, 0), z_dir=(1, 0, 0))) as fillet3_piece_12_section:
        with BuildLine():
            CenterArc((FILLET3_R * 2.41421356237, FILLET3_R), FILLET3_R, 135, 135)
            Line((FILLET3_R * 1.70710678119, FILLET3_R * 1.70710678119), (0, 0))
            Line((0, 0), (FILLET3_R * 2.41421356237, 0))
        make_face()
    fillet3_piece_12 = extrude(amount=28.687820151, mode=Mode.PRIVATE)
    fillet3_piece_12 = split(fillet3_piece_12, bisect_by=Plane(origin=(-12.592227722, -87.833840099, -8.114288132), z_dir=(1, 0, 0)), keep=Keep.TOP, mode=Mode.PRIVATE)
    add(fillet3_piece_12)
    with BuildSketch(Plane(origin=(-28.580047873, -40.439599823, -9.525), x_dir=(0, -0.7071067811865476, 0.7071067811865475), z_dir=(1, 0, 0))) as fillet3_piece_13_section:
        with BuildLine():
            CenterArc((FILLET3_R * 2.41421356237, FILLET3_R), FILLET3_R, 135, 135)
            Line((FILLET3_R * 1.70710678119, FILLET3_R * 1.70710678119), (0, 0))
            Line((0, 0), (FILLET3_R * 2.41421356237, 0))
        make_face()
    fillet3_piece_13 = extrude(amount=28.687820151, mode=Mode.PRIVATE)
    fillet3_piece_13 = split(fillet3_piece_13, bisect_by=Plane(origin=(-12.592227722, -43.845359547, -8.114288132), z_dir=(1, 0, 0)), keep=Keep.TOP, mode=Mode.PRIVATE)
    add(fillet3_piece_13)
    with BuildSketch(Plane(origin=(-12.705047873, -59.489599823, 9.525), x_dir=(0, 0.7071067811865468, -0.7071067811865481), z_dir=(1, 0, 0))) as fillet3_piece_14_section:
        with BuildLine():
            CenterArc((FILLET3_R * 0.414213562373, -FILLET3_R), FILLET3_R, 90, 45)
            Line((-FILLET3_R * 0.292893218813, -FILLET3_R * 0.292893218813), (0, 0))
            Line((0, 0), (FILLET3_R * 0.414213562373, 0))
        make_face()
    fillet3_piece_14 = extrude(amount=12.812820151, mode=Mode.PRIVATE)
    fillet3_piece_14 = split(fillet3_piece_14, bisect_by=Plane(origin=(-12.592227722, -59.568724789, 9.333975434), z_dir=(1, 0, 0)), keep=Keep.TOP, mode=Mode.PRIVATE)
    add(fillet3_piece_14)
    with BuildSketch(Plane(origin=(-28.580047873, -76.679727883, 9.525), x_dir=(0, -0.7071067811865475, -0.7071067811865476), z_dir=(1, 0, 0))) as fillet3_piece_15_section:
        with BuildLine():
            CenterArc((FILLET3_R * 2.41421356237, -FILLET3_R), FILLET3_R, 90, 135)
            Line((FILLET3_R * 1.70710678119, -FILLET3_R * 1.70710678119), (0, 0))
            Line((0, 0), (FILLET3_R * 2.41421356237, 0))
        make_face()
    fillet3_piece_15 = extrude(amount=28.687820151, mode=Mode.PRIVATE)
    fillet3_piece_15 = split(fillet3_piece_15, bisect_by=Plane(origin=(-12.592227722, -80.085487607, 8.114288132), z_dir=(1, 0, 0)), keep=Keep.TOP, mode=Mode.PRIVATE)
    add(fillet3_piece_15)
    with BuildSketch(Plane(origin=(-28.580047873, -121.129727883, 9.525), x_dir=(0, 0.7071067811865472, -0.7071067811865479), z_dir=(1, 0, 0))) as fillet3_piece_16_section:
        with BuildLine():
            CenterArc((FILLET3_R * 2.41421356237, FILLET3_R), FILLET3_R, 135, 135)
            Line((FILLET3_R * 1.70710678119, FILLET3_R * 1.70710678119), (0, 0))
            Line((0, 0), (FILLET3_R * 2.41421356237, 0))
        make_face()
    fillet3_piece_16 = extrude(amount=28.687820151, mode=Mode.PRIVATE)
    fillet3_piece_16 = split(fillet3_piece_16, bisect_by=Plane(origin=(-12.592227722, -117.723968159, 8.114288132), z_dir=(1, 0, 0)), keep=Keep.TOP, mode=Mode.PRIVATE)
    add(fillet3_piece_16)
    with BuildSketch(Plane(origin=(-12.705047873, -102.079727883, -9.525), x_dir=(0, 1, 0), z_dir=(1, 0, 0))) as fillet3_piece_17_section:
        with BuildLine():
            CenterArc((FILLET3_R * 0.414213562373, FILLET3_R), FILLET3_R, 225, 45)
            Line((-FILLET3_R * 0.292893218813, FILLET3_R * 0.292893218813), (0, 0))
            Line((0, 0), (FILLET3_R * 0.414213562373, 0))
        make_face()
    fillet3_piece_17 = extrude(amount=12.812820151, mode=Mode.PRIVATE)
    fillet3_piece_17 = split(fillet3_piece_17, bisect_by=Plane(origin=(-12.592227722, -102.000602917, -9.333975434), z_dir=(1, 0, 0)), keep=Keep.TOP, mode=Mode.PRIVATE)
    add(fillet3_piece_17)
    with BuildSketch(Plane(origin=(-12.705047873, -95.729727883, -9.525), x_dir=(0, 0.7071067811865455, 0.7071067811865495), z_dir=(1, 0, 0))) as fillet3_piece_18_section:
        with BuildLine():
            CenterArc((FILLET3_R * 0.414213562373, FILLET3_R), FILLET3_R, 225, 45)
            Line((-FILLET3_R * 0.292893218813, FILLET3_R * 0.292893218813), (0, 0))
            Line((0, 0), (FILLET3_R * 0.414213562373, 0))
        make_face()
    fillet3_piece_18 = extrude(amount=12.812820151, mode=Mode.PRIVATE)
    fillet3_piece_18 = split(fillet3_piece_18, bisect_by=Plane(origin=(-12.592227722, -95.808852849, -9.333975434), z_dir=(1, 0, 0)), keep=Keep.TOP, mode=Mode.PRIVATE)
    add(fillet3_piece_18)
    with BuildSketch(Plane(origin=(-28.580047873, -106.569855944, -9.525), x_dir=(0, -0.7071067811865474, 0.7071067811865476), z_dir=(1, 0, 0))) as fillet3_piece_19_section:
        with BuildLine():
            CenterArc((FILLET3_R * 2.41421356237, FILLET3_R), FILLET3_R, 135, 135)
            Line((FILLET3_R * 1.70710678119, FILLET3_R * 1.70710678119), (0, 0))
            Line((0, 0), (FILLET3_R * 2.41421356237, 0))
        make_face()
    fillet3_piece_19 = extrude(amount=28.687820151, mode=Mode.PRIVATE)
    fillet3_piece_19 = split(fillet3_piece_19, bisect_by=Plane(origin=(-12.592227722, -109.975615668, -8.114288132), z_dir=(1, 0, 0)), keep=Keep.TOP, mode=Mode.PRIVATE)
    add(fillet3_piece_19)
    with BuildSketch(Plane(origin=(-24.790771268, -143.999739587, 9.525), x_dir=(0, 0.5889746247804543, -0.8081515274778135), z_dir=(1, 0, 0))) as fillet3_piece_20_section:
        with BuildLine():
            CenterArc((6.187731916, 3.099666646), FILLET3_R, 143.915721818, 113.578178477)
            Line((3.621850817, 4.96966108), (0, 0))
            ThreePointArc((0, 0), (2.750103074, 0.301333415), (5.500206148, 0))
        make_face()
    fillet3_piece_20 = extrude(amount=24.898543546, mode=Mode.PRIVATE)
    fillet3_piece_20 = split(fillet3_piece_20, bisect_by=Plane(origin=(-12.592227722, -141.454802798, 8.459851128), z_dir=(1, 0, 0)), keep=Keep.TOP, mode=Mode.PRIVATE)
    add(fillet3_piece_20)
    with BuildSketch(Plane(origin=(-24.790771268, -143.999739587, -9.525), x_dir=(0, 1, 0), z_dir=(1, 0, 0))) as fillet3_piece_21_section:
        with BuildLine():
            CenterArc((6.149417419, 3.175), FILLET3_R, 156.421821523, 113.578178477)
            ThreePointArc((3.239481852, 4.445), (1.863263986, 2.045022265), (0, 0))
            Line((0, 0), (6.149417419, 0))
        make_face()
    fillet3_piece_21 = extrude(amount=24.898543546, mode=Mode.PRIVATE)
    fillet3_piece_21 = split(fillet3_piece_21, bisect_by=Plane(origin=(-12.592227722, -141.454802798, -8.459851128), z_dir=(1, 0, 0)), keep=Keep.TOP, mode=Mode.PRIVATE)
    add(fillet3_piece_21)


solid = cut_extrude4_piece_1_1.part
